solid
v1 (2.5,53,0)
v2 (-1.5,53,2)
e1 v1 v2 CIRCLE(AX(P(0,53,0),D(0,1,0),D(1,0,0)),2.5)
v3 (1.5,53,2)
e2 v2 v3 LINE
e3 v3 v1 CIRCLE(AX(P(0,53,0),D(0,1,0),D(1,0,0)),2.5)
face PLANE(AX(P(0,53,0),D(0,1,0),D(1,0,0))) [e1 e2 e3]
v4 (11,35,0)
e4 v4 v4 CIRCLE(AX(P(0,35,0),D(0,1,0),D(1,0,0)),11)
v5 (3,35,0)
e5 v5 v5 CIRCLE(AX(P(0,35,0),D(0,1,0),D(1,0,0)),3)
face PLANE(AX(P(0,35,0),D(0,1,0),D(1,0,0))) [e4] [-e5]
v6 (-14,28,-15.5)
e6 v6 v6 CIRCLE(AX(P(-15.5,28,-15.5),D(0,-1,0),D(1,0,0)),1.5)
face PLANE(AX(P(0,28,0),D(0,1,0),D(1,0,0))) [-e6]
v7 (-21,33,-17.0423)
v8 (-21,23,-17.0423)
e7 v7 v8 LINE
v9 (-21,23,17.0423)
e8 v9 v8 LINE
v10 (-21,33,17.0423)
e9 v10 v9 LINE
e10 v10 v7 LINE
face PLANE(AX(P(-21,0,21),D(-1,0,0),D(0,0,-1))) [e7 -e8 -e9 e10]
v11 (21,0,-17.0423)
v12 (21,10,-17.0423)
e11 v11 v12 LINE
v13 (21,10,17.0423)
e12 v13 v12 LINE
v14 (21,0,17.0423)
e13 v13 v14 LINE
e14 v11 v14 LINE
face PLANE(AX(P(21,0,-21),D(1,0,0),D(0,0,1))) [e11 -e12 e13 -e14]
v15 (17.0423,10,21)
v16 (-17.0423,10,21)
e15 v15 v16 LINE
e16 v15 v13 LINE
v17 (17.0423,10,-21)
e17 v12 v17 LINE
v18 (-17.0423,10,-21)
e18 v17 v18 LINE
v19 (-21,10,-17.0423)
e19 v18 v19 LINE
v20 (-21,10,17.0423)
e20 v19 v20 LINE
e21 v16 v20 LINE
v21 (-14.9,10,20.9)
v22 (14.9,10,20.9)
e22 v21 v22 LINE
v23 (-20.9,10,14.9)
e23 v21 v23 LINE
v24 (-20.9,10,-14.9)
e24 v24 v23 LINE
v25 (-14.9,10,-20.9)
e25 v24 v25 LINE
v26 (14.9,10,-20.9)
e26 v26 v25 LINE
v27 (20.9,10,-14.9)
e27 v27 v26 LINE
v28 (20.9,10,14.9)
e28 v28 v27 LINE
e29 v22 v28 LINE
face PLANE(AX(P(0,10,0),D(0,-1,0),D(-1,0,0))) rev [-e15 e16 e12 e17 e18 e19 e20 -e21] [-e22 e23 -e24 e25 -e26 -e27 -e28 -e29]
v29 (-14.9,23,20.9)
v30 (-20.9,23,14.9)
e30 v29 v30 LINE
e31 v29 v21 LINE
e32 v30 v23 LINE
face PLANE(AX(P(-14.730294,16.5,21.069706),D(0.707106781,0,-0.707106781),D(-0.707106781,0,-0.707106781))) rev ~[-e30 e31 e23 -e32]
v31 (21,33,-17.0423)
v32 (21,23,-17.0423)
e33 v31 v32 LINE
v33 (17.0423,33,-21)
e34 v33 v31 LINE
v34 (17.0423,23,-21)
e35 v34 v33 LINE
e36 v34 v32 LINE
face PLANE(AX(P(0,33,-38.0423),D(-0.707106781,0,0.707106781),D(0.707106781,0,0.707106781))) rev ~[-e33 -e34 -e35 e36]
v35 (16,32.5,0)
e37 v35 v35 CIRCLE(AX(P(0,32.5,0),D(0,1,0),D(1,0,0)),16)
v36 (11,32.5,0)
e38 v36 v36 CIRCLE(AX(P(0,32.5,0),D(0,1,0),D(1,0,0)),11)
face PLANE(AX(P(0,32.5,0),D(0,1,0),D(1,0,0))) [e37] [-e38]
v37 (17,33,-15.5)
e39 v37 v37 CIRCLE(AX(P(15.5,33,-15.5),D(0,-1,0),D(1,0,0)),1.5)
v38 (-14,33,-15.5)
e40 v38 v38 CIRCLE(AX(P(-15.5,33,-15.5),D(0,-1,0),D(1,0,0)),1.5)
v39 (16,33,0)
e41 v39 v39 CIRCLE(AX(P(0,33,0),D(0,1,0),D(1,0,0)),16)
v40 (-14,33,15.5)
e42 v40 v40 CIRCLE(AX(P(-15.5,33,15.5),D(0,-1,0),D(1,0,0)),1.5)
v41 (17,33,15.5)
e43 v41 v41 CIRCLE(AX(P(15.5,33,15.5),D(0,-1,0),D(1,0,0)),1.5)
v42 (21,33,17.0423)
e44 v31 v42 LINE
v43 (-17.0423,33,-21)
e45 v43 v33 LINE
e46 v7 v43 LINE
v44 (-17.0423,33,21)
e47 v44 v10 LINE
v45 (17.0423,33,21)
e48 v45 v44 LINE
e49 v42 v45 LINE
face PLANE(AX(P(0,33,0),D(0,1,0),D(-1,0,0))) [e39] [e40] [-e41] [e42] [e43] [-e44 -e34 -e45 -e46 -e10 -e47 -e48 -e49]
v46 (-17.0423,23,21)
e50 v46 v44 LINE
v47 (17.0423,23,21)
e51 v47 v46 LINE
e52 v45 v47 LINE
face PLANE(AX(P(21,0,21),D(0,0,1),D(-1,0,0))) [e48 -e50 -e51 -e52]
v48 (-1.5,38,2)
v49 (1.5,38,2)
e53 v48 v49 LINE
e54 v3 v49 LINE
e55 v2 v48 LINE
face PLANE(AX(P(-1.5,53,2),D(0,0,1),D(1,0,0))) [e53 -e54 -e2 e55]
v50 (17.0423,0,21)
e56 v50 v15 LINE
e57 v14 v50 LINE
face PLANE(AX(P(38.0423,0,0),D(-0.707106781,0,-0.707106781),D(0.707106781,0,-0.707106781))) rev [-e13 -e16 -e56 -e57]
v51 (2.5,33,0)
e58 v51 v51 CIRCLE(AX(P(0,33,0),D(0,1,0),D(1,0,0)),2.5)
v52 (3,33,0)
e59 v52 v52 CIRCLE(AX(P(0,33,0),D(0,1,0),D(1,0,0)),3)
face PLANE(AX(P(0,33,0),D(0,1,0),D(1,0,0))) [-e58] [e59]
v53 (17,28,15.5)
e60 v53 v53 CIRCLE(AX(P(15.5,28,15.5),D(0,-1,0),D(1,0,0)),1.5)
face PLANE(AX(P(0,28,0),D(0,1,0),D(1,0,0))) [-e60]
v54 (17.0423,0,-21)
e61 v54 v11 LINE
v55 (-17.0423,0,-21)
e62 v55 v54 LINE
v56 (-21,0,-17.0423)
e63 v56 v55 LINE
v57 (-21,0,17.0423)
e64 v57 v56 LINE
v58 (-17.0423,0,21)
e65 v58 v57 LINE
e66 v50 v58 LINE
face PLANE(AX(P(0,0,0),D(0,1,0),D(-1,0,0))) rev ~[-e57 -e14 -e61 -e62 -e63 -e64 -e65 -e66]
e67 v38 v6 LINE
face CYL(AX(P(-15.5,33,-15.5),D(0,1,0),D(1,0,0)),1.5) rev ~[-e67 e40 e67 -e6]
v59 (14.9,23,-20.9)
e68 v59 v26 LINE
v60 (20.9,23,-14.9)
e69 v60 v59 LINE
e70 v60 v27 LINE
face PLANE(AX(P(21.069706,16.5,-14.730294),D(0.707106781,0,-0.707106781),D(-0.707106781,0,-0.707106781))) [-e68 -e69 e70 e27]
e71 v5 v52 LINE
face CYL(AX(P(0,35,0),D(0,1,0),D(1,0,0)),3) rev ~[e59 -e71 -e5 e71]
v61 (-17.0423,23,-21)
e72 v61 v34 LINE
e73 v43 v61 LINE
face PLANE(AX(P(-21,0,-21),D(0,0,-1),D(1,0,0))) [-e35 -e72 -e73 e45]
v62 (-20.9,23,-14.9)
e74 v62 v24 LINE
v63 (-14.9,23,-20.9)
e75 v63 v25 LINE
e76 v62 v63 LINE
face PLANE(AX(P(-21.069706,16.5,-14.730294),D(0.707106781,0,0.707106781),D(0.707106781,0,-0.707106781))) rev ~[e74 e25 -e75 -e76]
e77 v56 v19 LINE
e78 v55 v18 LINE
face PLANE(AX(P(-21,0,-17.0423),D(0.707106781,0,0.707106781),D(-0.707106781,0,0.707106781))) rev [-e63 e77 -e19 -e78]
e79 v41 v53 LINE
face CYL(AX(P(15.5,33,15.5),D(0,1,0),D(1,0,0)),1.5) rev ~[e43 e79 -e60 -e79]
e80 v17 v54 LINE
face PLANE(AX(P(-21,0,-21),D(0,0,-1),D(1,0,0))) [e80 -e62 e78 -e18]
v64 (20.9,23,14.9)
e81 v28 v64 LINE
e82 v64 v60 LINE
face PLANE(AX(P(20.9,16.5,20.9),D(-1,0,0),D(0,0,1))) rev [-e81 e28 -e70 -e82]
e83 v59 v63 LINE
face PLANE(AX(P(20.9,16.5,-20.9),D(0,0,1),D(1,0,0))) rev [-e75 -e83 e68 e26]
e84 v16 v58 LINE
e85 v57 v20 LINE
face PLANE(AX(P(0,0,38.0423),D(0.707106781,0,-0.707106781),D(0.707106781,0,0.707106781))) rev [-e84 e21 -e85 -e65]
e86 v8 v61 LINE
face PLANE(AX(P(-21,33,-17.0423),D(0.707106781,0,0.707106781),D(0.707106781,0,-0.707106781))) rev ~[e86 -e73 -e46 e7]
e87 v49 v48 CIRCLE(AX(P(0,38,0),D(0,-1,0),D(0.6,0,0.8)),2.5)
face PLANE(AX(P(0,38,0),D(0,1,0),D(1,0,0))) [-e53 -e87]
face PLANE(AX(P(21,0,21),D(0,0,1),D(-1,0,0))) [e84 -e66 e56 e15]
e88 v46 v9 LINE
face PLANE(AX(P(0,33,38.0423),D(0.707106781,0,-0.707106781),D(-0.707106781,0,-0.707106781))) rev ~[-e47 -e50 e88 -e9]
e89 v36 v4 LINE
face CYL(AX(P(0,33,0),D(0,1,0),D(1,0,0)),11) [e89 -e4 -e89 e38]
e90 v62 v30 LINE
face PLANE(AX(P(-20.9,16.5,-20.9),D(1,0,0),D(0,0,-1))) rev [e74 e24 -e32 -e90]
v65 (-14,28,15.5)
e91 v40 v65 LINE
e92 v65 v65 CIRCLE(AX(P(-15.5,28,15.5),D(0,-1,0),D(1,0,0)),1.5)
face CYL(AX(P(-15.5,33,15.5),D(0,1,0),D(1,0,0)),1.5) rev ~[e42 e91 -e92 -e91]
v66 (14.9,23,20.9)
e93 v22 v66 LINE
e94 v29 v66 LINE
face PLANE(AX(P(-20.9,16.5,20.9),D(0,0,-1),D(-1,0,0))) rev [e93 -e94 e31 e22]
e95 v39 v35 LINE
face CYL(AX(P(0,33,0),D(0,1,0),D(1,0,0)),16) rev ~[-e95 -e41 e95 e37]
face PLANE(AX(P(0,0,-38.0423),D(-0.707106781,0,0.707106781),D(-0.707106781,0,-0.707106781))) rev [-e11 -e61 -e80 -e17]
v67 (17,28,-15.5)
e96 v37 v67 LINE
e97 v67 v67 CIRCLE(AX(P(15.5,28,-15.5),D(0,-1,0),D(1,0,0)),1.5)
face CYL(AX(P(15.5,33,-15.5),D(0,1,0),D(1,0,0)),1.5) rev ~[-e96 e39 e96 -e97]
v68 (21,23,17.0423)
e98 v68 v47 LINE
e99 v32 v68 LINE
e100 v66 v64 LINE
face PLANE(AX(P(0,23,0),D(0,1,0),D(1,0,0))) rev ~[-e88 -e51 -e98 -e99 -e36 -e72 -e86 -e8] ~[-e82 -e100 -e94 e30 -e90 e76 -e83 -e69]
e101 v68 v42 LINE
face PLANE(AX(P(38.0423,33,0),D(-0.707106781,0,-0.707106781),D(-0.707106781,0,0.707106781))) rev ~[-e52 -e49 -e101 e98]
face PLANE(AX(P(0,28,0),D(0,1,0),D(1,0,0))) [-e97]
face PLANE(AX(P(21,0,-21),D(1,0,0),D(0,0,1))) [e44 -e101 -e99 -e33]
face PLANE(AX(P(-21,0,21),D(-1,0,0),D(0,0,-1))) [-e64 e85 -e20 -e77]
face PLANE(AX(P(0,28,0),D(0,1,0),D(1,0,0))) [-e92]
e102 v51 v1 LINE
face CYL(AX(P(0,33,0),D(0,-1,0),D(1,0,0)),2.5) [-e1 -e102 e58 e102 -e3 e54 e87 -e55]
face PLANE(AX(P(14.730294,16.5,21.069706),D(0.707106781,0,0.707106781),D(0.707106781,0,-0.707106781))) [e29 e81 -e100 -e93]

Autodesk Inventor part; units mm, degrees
ref_plane "YZ Plane" through (0, 0, 0) normal (1, 0, 0) x (0, 1, 0)
ref_plane "XZ Plane" through (0, 0, 0) normal (0, 1, 0) x (-1, 0, 0)
sketch "Sketch1" plane through (0, 0, 0) normal (0, 1, 0) x (-1, 0, 0)
  line L0 (-21, 21) -> (21, 21)
  line L1 (21, 21) -> (21, -21)
  line L2 (21, -21) -> (-21, -21)
  line L3 (-21, -21) -> (-21, 21)
  line L4 (-21, 21) -> (21, -21) construction
  line L5 (21, 21) -> (-21, -21) construction
  point P0 (0, 0)
  dimension "d0" = 42
  dimension "d1" = 42
extrude "Extrusion1" add sketch "Sketch1" along normal blind 33
ref_plane "Work Plane1" through (0, 16.5, 0) normal (0, 1, 0) x (1, 0, 0)
sketch "Sketch2" plane through (0, 33, 0) normal (0, 1, 0) x (1, 0, 0)
  line L0 (0, -38.0423) -> (-38.0423, 0)
  line L1 (-38.0423, 0) -> (0, 38.0423)
  line L2 (0, 38.0423) -> (38.0423, 0)
  line L3 (38.0423, 0) -> (0, -38.0423)
  line L4 (0, -38.0423) -> (0, 38.0423) construction
  line L5 (-38.0423, 0) -> (38.0423, 0) construction
  line L6 (-21, 21) -> (-21, -21) projected
  circle A0 centre (0, 0) radius 250
  dimension "d4" = 53.8
  dimension "d5" = 53.8
  dimension "d6" = 500
extrude "Extrusion2" cut sketch "Sketch2" against normal blind 10
sketch "Sketch3" plane through (0, 16.5, 0) normal (0, 1, 0) x (1, 0, 0)
  line L0 (-20.9, -20.9) -> (20.9, -20.9)
  line L1 (20.9, -20.9) -> (20.9, 20.9)
  line L2 (20.9, 20.9) -> (-20.9, 20.9)
  line L3 (-20.9, 20.9) -> (-20.9, -20.9)
  line L4 (-21, -21) -> (-21, -17.0423) projected
  line L5 (21, -21) -> (17.0423, -21) projected
  line L6 (21, 21) -> (21, 17.0423) projected
  line L7 (-21, 21) -> (-17.0423, 21) projected
  circle A0 centre (0, 0) radius 200
  dimension "d9" = 0.1
  dimension "d10" = 0.1
  dimension "d11" = 0.1
  dimension "d12" = 0.1
  dimension "d13" = 400
extrude "Extrusion3" cut sketch "Sketch3" along normal up to surface (6.5 mm away)
chamfer "Chamfer1" distance 6 angle 45 4 edges at (20.9, 19.75, 20.9) (20.9, 19.75, -20.9) (-20.9, 19.75, 20.9) (-20.9, 19.75, -20.9)
mirror "Mirror1" about plane through (0, 16.5, 0) normal (0, 1, 0) of "Extrusion3", "Extrusion2", "Chamfer1"
sketch "Sketch4" plane through (0, 33, 0) normal (0, 1, 0) x (1, 0, 0)
  circle A0 centre (0, 0) radius 11
  dimension "d19" = 22
extrude "Extrusion4" add sketch "Sketch4" along normal blind 2
sketch "Sketch5" plane through (0, 33, 0) normal (0, 1, 0) x (1, 0, 0)
  circle A0 centre (0, 0) radius 11 projected
  line L0 (17.0423, -21) -> (21, -17.0423) projected
  line L1 (21, -17.0423) -> (21, 17.0423) projected
  line L2 (21, 17.0423) -> (17.0423, 21) projected
  line L3 (17.0423, 21) -> (-17.0423, 21) projected
  line L4 (-17.0423, 21) -> (-21, 17.0423) projected
  line L5 (-21, 17.0423) -> (-21, -17.0423) projected
  line L6 (-21, -17.0423) -> (-17.0423, -21) projected
  line L7 (-17.0423, -21) -> (17.0423, -21) projected
  circle A1 centre (0, 0) radius 16
  dimension "d22" = 32
extrude "Extrusion5" cut sketch "Sketch5" against normal blind 0.5 contours A1
sketch "Sketch6" plane through (0, 35, 0) normal (0, 1, 0) x (1, 0, 0)
  circle A0 centre (0, 0) radius 3
  dimension "d25" = 6
extrude "Extrusion6" cut sketch "Sketch6" against normal blind 2
sketch "Sketch8" plane through (0, 33, 0) normal (0, 1, 0) x (1, 0, 0)
  circle A0 centre (0, 0) radius 16 construction
  line L0 (17.0423, -21) -> (21, -17.0423) construction
  line L1 (21, -17.0423) -> (21, 17.0423) construction
  line L2 (21, 17.0423) -> (17.0423, 21) construction
  line L3 (17.0423, 21) -> (-17.0423, 21) construction
  line L4 (-17.0423, 21) -> (-21, 17.0423) construction
  line L5 (-21, 17.0423) -> (-21, -17.0423) construction
  line L6 (-21, -17.0423) -> (-17.0423, -21) construction
  line L7 (-17.0423, -21) -> (17.0423, -21) construction
  line L8 (-15.5, -15.5) -> (15.5, -15.5) construction
  line L9 (15.5, -15.5) -> (15.5, 15.5) construction
  line L10 (15.5, 15.5) -> (-15.5, 15.5) construction
  line L11 (-15.5, 15.5) -> (-15.5, -15.5) construction
  line L12 (-15.5, -15.5) -> (15.5, 15.5) construction
  line L13 (15.5, -15.5) -> (-15.5, 15.5) construction
  circle A1 centre (-15.5, 15.5) radius 1.5
  circle A2 centre (15.5, 15.5) radius 1.5
  circle A3 centre (15.5, -15.5) radius 1.5
  circle A4 centre (-15.5, -15.5) radius 1.5
  dimension "d36" = 31
  dimension "d37" = 31
  dimension "d38" = 3
  dimension "d39" = 3
  dimension "d40" = 3
  dimension "d41" = 3
extrude "Extrusion8" cut sketch "Sketch8" against normal blind 5
thread "Thread2" size "M3x0.5" class "6H" standard "ANSI Metric M Profile" full length
sketch "Sketch9" plane through (0, 33, 0) normal (0, 1, 0) x (1, 0, 0)
  circle A0 centre (0, 0) radius 2.5
  dimension "d49" = 5
extrude "Extrusion9" add sketch "Sketch9" along normal blind 20
pattern_circular "Circular Pattern2" count 4 over 360 about axis through (0, 33, 0) along (0, 1, 0) of "Extrusion8"
sketch "Sketch10" plane through (0, 53, 0) normal (0, 1, 0) x (1, 0, 0)
  circle A0 centre (0, 0) radius 2.5 projected
  circle A1 centre (0, 0) radius 2.5 projected
  line L0 (-1.5, -2) -> (1.5, -2)
  line L1 (1.5, -2) -> (1.5, -2.5)
  line L2 (1.5, -2.5) -> (-1.5, -2.5)
  line L3 (-1.5, -2.5) -> (-1.5, -2)
  circle A2 centre (0, 0) radius 2.5 projected
  dimension "d55" = 0.5
extrude "Extrusion10" cut sketch "Sketch10" against normal blind 15 contours L0 A0 | A0 L2 L3 | L1 L2 A0 picked at (0.3466, -2.0912)
equation "\"d9\" = d10"
equation "\"d11\" = d10"
equation "\"d12\" = d10"
properties part number "nema17_33mm"
